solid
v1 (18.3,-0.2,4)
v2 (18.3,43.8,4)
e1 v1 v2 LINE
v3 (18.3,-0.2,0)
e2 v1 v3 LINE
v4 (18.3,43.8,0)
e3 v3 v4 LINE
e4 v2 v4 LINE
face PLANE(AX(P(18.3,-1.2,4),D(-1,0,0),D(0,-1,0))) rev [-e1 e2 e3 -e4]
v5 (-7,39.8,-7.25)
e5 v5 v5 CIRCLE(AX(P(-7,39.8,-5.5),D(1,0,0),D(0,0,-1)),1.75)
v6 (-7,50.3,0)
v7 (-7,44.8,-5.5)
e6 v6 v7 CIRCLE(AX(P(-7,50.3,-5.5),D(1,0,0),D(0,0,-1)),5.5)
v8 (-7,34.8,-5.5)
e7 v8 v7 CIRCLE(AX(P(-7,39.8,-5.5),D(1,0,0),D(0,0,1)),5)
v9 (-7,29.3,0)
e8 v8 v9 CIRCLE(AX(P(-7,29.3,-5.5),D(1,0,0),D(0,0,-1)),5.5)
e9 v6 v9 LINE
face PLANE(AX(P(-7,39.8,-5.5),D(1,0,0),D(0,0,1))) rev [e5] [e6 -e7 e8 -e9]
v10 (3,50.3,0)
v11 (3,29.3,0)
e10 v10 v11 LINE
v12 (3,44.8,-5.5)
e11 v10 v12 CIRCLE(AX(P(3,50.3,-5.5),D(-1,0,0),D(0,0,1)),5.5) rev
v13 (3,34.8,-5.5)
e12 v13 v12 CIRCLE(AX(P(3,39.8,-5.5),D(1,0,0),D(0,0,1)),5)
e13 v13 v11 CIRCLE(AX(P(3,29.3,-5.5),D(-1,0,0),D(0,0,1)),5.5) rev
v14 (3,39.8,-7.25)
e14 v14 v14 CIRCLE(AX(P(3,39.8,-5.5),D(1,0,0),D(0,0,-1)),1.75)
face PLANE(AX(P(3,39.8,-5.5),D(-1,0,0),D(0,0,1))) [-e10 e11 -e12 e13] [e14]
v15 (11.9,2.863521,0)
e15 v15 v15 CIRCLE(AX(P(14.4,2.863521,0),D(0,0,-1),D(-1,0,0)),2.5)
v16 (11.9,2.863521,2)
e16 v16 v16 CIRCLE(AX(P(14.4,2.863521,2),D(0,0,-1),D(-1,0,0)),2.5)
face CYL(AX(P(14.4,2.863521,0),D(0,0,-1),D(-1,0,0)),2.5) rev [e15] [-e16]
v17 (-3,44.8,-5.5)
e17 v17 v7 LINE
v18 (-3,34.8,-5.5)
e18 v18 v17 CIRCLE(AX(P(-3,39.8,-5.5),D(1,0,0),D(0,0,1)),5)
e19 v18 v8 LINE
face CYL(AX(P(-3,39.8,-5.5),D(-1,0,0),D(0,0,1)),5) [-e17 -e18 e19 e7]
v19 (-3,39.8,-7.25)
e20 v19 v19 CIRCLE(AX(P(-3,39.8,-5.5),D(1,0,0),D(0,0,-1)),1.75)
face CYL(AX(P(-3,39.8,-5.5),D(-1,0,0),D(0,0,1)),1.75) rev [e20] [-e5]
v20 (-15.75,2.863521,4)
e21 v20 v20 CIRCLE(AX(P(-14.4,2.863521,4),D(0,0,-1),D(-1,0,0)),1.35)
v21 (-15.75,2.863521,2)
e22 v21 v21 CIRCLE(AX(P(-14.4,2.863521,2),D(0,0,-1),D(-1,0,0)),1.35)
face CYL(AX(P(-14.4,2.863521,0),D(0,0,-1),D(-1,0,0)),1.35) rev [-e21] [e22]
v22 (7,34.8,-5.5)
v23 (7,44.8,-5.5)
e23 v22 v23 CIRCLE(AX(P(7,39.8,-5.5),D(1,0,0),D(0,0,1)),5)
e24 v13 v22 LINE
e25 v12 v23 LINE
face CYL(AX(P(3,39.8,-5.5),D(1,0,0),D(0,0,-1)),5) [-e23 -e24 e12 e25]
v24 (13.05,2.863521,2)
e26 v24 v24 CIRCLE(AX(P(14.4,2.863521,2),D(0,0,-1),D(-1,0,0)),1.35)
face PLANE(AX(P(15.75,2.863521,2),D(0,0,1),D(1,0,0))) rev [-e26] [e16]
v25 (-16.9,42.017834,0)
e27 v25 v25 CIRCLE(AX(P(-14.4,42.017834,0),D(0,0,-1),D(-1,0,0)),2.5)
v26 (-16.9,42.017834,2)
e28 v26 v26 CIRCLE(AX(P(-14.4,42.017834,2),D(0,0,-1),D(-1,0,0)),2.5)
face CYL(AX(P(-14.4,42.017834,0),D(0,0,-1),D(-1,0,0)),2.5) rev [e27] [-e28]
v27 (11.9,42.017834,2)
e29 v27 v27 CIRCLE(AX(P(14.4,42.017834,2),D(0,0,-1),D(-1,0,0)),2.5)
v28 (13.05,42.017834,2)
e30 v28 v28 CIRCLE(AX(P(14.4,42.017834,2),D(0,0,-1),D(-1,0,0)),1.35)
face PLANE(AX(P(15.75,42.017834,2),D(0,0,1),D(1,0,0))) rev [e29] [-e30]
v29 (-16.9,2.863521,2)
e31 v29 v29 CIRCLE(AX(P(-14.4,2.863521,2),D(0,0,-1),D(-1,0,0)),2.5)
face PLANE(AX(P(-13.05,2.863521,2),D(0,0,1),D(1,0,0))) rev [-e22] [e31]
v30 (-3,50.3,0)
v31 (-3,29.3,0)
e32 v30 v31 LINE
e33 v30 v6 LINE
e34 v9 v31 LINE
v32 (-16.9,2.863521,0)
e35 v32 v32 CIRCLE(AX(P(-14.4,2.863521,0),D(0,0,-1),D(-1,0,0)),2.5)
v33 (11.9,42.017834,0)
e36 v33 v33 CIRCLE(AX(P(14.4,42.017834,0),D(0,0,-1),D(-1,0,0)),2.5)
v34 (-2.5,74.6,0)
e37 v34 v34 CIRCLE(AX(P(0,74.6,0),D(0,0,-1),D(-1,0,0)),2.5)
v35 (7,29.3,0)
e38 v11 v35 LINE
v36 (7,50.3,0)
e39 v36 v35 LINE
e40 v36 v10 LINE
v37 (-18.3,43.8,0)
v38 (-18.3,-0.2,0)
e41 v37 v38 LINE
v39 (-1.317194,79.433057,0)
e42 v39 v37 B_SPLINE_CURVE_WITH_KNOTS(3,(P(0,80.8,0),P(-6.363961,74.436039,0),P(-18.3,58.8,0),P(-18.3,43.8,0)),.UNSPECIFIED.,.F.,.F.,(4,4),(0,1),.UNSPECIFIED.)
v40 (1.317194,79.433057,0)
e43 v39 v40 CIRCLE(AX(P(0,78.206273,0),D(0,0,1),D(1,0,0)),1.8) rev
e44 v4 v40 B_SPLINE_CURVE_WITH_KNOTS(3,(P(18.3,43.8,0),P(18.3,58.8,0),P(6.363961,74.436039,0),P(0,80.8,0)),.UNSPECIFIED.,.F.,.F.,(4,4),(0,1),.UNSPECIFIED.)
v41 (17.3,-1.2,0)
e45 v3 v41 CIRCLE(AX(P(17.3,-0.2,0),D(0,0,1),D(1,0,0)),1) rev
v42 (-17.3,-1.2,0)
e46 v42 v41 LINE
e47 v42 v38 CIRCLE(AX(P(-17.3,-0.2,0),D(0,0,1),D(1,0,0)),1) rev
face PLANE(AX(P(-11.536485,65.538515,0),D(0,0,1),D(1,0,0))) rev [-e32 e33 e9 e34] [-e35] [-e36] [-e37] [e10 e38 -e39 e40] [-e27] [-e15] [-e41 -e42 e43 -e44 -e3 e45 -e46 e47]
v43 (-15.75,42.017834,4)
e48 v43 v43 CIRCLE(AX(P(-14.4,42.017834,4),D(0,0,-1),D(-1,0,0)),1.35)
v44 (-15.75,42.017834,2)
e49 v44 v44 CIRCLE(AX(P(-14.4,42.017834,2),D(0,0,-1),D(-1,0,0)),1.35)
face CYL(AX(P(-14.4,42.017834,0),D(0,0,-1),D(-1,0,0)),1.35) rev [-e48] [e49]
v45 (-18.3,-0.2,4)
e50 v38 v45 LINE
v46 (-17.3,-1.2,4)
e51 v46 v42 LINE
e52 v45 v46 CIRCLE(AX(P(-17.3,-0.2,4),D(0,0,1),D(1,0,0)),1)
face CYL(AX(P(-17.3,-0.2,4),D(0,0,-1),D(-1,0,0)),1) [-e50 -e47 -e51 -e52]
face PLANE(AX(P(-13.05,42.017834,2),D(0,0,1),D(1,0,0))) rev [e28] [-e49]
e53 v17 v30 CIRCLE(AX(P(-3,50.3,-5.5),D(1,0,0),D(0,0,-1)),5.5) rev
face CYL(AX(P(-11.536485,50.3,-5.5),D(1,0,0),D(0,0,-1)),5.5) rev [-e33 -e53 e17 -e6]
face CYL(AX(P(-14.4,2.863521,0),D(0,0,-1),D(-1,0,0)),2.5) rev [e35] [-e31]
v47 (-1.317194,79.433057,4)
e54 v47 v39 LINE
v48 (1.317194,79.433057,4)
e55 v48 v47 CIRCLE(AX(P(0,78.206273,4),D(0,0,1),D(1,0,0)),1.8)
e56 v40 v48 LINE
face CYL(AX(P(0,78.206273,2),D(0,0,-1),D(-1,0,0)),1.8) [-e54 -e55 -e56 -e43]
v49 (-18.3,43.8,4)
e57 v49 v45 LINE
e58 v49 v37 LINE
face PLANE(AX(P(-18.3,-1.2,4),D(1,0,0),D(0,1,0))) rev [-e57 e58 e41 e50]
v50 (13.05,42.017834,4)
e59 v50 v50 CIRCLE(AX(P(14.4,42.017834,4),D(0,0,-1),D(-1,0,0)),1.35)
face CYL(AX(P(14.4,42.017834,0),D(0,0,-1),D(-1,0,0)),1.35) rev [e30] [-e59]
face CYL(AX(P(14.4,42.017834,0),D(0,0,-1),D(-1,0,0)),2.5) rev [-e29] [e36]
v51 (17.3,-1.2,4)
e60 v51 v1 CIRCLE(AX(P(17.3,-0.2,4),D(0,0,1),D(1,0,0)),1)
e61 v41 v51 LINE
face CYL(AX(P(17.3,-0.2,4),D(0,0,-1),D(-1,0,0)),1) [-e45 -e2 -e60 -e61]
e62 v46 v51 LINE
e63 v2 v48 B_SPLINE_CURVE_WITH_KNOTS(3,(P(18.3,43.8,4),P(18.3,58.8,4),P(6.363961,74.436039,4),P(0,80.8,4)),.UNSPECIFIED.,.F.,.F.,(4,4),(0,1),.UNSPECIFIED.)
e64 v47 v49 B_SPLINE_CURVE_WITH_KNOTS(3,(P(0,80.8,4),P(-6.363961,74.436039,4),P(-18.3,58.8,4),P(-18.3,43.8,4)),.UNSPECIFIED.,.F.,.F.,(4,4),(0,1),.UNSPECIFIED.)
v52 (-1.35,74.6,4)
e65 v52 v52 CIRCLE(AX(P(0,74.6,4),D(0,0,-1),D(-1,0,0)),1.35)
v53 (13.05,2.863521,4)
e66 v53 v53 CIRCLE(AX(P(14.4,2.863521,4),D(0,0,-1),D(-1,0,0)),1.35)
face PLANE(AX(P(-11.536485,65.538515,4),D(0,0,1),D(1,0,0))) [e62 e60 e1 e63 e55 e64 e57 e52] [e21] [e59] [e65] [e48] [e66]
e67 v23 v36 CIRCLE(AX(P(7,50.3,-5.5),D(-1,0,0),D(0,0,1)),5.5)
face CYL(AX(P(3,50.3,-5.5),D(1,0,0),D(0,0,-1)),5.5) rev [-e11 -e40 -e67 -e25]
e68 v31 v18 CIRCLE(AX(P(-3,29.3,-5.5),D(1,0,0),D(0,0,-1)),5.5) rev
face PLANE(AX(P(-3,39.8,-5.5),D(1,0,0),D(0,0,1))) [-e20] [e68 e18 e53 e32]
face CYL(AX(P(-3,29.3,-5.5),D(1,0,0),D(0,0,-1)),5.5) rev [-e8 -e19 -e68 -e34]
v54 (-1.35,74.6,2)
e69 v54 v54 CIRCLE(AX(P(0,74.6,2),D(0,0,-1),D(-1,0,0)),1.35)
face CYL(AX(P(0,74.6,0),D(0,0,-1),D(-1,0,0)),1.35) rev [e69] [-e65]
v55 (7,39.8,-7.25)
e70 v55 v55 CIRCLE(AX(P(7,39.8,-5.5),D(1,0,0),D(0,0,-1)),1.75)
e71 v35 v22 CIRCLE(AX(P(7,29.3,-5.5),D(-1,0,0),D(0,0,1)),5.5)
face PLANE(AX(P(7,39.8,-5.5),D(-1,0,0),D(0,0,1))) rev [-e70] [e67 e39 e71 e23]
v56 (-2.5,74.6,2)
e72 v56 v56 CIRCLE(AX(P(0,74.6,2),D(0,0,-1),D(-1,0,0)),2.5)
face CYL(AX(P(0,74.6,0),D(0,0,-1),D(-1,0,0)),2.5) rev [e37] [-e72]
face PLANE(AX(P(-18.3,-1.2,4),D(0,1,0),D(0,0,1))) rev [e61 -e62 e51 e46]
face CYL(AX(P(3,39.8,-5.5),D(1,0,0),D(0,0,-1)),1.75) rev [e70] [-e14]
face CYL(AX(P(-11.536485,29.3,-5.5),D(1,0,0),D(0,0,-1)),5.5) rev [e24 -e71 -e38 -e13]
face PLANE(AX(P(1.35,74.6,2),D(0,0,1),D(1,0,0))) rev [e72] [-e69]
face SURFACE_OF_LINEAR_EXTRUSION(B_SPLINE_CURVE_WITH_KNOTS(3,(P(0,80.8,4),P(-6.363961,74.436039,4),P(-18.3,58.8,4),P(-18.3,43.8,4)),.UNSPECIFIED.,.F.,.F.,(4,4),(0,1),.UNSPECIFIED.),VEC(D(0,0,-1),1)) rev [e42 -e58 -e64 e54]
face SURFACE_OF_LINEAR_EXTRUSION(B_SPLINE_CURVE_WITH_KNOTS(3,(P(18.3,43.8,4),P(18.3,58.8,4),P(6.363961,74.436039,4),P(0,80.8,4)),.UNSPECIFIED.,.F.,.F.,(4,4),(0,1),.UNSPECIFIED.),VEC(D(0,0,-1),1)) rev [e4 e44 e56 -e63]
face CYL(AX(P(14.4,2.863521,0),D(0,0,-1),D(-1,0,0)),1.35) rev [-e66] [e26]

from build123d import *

# Parameters (mm, degrees)
BOSS_EXTRUDE1_DEPTH                     = 4
CBORE_FOR_M5_HEX_HEAD_BOLT1_D           = 2.7
CBORE_FOR_M5_HEX_HEAD_BOLT1_CBORE_D     = 5
CBORE_FOR_M5_HEX_HEAD_BOLT1_CBORE_DEPTH = 2
SKETCH6_R                               = 1.75
BOSS_EXTRUDE2_DEPTH                     = 4
FILLET1_R                               = 5.5
FILLET1_OF_MIRROR1_R                    = 5.5
FILLET2_R                               = 1.8
FILLET3_R                               = 1


with BuildPart() as part:
    # Sketch2 → Boss-Extrude1 (new body)
    with BuildSketch(Plane.XY):
        with BuildLine():
            Line((-18.3, -1.2), (18.3, -1.2))
            Line((18.3, -1.2), (18.3, 43.8))
            add(Edge.make_bspline(
                [(18.3, 43.8), (18.3, 58.8), (6.363961031, 74.436038969), (0, 80.8)],
                knots=[0, 0, 0, 0, 1, 1, 1, 1], degree=3))
            add(Edge.make_bspline(
                [(-18.3, 43.8), (-18.3, 58.8), (-6.363961031, 74.436038969), (0, 80.8)],
                knots=[0, 0, 0, 0, 1, 1, 1, 1], degree=3))
            Line((-18.3, 43.8), (-18.3, -1.2))
        make_face()
    extrude(amount=BOSS_EXTRUDE1_DEPTH)

    # CBORE for M5 Hex Head Bolt1 (through all)
    with Locations(Plane(origin=(0, 0, 0), x_dir=(-1, 0, 0), z_dir=(0, 0, -1))):
        with Locations((14.4, 42.017834424), (14.4, 2.863521172), (-14.4, 2.863521172), (-14.4, 42.017834424), (0, 74.6)):
            CounterBoreHole(CBORE_FOR_M5_HEX_HEAD_BOLT1_D / 2, CBORE_FOR_M5_HEX_HEAD_BOLT1_CBORE_D / 2, CBORE_FOR_M5_HEX_HEAD_BOLT1_CBORE_DEPTH)

    # Sketch6 → Boss-Extrude2 (add)
    with BuildSketch(Plane(origin=(7, 0, 0), x_dir=(0, 0, -1), z_dir=(1, 0, 0))):
        with BuildLine():
            Line((0, 44.8), (5.5, 44.8))
            ThreePointArc((5.5, 44.8), (10.5, 39.8), (5.5, 34.8))
            Line((5.5, 34.8), (0, 34.8))
            Line((0, 34.8), (0, 44.8))
        make_face()
        with Locations((5.5, 39.8)):
            Circle(SKETCH6_R, mode=Mode.SUBTRACT)
    boss_extrude2 = extrude(amount=-BOSS_EXTRUDE2_DEPTH)

    # Fillet1
    fillet1_edges = [part.edges().sort_by_distance(p)[0] for p in [
        (5, 34.8, 0),
        (5, 44.8, 0),
    ]]
    fillet(fillet1_edges, radius=FILLET1_R - 0.0001)  # a hair under: the kernel refuses the full size

    # Mirror1: Boss-Extrude2 across plane
    add(boss_extrude2.mirror(Plane(origin=(0, 0, 0), x_dir=(0, 0, 1), z_dir=(1, 0, 0))))

    # Fillet1 of Mirror1
    fillet1_of_mirror1_edges = [part.edges().sort_by_distance(p)[0] for p in [
        (-5, 34.8, 0),
        (-5, 44.8, 0),
    ]]
    fillet(fillet1_of_mirror1_edges, radius=FILLET1_OF_MIRROR1_R - 0.0001)  # a hair under: the kernel refuses the full size

    # Fillet2
    fillet2_edges = [part.edges().sort_by_distance(p)[0] for p in [
        (0, 80.8, 2),
    ]]
    fillet(fillet2_edges, radius=FILLET2_R)

    # Fillet3
    fillet3_edges = [part.edges().sort_by_distance(p)[0] for p in [
        (18.3, -1.2, 2),
        (-18.3, -1.2, 2),
    ]]
    fillet(fillet3_edges, radius=FILLET3_R)


solid = part.part
